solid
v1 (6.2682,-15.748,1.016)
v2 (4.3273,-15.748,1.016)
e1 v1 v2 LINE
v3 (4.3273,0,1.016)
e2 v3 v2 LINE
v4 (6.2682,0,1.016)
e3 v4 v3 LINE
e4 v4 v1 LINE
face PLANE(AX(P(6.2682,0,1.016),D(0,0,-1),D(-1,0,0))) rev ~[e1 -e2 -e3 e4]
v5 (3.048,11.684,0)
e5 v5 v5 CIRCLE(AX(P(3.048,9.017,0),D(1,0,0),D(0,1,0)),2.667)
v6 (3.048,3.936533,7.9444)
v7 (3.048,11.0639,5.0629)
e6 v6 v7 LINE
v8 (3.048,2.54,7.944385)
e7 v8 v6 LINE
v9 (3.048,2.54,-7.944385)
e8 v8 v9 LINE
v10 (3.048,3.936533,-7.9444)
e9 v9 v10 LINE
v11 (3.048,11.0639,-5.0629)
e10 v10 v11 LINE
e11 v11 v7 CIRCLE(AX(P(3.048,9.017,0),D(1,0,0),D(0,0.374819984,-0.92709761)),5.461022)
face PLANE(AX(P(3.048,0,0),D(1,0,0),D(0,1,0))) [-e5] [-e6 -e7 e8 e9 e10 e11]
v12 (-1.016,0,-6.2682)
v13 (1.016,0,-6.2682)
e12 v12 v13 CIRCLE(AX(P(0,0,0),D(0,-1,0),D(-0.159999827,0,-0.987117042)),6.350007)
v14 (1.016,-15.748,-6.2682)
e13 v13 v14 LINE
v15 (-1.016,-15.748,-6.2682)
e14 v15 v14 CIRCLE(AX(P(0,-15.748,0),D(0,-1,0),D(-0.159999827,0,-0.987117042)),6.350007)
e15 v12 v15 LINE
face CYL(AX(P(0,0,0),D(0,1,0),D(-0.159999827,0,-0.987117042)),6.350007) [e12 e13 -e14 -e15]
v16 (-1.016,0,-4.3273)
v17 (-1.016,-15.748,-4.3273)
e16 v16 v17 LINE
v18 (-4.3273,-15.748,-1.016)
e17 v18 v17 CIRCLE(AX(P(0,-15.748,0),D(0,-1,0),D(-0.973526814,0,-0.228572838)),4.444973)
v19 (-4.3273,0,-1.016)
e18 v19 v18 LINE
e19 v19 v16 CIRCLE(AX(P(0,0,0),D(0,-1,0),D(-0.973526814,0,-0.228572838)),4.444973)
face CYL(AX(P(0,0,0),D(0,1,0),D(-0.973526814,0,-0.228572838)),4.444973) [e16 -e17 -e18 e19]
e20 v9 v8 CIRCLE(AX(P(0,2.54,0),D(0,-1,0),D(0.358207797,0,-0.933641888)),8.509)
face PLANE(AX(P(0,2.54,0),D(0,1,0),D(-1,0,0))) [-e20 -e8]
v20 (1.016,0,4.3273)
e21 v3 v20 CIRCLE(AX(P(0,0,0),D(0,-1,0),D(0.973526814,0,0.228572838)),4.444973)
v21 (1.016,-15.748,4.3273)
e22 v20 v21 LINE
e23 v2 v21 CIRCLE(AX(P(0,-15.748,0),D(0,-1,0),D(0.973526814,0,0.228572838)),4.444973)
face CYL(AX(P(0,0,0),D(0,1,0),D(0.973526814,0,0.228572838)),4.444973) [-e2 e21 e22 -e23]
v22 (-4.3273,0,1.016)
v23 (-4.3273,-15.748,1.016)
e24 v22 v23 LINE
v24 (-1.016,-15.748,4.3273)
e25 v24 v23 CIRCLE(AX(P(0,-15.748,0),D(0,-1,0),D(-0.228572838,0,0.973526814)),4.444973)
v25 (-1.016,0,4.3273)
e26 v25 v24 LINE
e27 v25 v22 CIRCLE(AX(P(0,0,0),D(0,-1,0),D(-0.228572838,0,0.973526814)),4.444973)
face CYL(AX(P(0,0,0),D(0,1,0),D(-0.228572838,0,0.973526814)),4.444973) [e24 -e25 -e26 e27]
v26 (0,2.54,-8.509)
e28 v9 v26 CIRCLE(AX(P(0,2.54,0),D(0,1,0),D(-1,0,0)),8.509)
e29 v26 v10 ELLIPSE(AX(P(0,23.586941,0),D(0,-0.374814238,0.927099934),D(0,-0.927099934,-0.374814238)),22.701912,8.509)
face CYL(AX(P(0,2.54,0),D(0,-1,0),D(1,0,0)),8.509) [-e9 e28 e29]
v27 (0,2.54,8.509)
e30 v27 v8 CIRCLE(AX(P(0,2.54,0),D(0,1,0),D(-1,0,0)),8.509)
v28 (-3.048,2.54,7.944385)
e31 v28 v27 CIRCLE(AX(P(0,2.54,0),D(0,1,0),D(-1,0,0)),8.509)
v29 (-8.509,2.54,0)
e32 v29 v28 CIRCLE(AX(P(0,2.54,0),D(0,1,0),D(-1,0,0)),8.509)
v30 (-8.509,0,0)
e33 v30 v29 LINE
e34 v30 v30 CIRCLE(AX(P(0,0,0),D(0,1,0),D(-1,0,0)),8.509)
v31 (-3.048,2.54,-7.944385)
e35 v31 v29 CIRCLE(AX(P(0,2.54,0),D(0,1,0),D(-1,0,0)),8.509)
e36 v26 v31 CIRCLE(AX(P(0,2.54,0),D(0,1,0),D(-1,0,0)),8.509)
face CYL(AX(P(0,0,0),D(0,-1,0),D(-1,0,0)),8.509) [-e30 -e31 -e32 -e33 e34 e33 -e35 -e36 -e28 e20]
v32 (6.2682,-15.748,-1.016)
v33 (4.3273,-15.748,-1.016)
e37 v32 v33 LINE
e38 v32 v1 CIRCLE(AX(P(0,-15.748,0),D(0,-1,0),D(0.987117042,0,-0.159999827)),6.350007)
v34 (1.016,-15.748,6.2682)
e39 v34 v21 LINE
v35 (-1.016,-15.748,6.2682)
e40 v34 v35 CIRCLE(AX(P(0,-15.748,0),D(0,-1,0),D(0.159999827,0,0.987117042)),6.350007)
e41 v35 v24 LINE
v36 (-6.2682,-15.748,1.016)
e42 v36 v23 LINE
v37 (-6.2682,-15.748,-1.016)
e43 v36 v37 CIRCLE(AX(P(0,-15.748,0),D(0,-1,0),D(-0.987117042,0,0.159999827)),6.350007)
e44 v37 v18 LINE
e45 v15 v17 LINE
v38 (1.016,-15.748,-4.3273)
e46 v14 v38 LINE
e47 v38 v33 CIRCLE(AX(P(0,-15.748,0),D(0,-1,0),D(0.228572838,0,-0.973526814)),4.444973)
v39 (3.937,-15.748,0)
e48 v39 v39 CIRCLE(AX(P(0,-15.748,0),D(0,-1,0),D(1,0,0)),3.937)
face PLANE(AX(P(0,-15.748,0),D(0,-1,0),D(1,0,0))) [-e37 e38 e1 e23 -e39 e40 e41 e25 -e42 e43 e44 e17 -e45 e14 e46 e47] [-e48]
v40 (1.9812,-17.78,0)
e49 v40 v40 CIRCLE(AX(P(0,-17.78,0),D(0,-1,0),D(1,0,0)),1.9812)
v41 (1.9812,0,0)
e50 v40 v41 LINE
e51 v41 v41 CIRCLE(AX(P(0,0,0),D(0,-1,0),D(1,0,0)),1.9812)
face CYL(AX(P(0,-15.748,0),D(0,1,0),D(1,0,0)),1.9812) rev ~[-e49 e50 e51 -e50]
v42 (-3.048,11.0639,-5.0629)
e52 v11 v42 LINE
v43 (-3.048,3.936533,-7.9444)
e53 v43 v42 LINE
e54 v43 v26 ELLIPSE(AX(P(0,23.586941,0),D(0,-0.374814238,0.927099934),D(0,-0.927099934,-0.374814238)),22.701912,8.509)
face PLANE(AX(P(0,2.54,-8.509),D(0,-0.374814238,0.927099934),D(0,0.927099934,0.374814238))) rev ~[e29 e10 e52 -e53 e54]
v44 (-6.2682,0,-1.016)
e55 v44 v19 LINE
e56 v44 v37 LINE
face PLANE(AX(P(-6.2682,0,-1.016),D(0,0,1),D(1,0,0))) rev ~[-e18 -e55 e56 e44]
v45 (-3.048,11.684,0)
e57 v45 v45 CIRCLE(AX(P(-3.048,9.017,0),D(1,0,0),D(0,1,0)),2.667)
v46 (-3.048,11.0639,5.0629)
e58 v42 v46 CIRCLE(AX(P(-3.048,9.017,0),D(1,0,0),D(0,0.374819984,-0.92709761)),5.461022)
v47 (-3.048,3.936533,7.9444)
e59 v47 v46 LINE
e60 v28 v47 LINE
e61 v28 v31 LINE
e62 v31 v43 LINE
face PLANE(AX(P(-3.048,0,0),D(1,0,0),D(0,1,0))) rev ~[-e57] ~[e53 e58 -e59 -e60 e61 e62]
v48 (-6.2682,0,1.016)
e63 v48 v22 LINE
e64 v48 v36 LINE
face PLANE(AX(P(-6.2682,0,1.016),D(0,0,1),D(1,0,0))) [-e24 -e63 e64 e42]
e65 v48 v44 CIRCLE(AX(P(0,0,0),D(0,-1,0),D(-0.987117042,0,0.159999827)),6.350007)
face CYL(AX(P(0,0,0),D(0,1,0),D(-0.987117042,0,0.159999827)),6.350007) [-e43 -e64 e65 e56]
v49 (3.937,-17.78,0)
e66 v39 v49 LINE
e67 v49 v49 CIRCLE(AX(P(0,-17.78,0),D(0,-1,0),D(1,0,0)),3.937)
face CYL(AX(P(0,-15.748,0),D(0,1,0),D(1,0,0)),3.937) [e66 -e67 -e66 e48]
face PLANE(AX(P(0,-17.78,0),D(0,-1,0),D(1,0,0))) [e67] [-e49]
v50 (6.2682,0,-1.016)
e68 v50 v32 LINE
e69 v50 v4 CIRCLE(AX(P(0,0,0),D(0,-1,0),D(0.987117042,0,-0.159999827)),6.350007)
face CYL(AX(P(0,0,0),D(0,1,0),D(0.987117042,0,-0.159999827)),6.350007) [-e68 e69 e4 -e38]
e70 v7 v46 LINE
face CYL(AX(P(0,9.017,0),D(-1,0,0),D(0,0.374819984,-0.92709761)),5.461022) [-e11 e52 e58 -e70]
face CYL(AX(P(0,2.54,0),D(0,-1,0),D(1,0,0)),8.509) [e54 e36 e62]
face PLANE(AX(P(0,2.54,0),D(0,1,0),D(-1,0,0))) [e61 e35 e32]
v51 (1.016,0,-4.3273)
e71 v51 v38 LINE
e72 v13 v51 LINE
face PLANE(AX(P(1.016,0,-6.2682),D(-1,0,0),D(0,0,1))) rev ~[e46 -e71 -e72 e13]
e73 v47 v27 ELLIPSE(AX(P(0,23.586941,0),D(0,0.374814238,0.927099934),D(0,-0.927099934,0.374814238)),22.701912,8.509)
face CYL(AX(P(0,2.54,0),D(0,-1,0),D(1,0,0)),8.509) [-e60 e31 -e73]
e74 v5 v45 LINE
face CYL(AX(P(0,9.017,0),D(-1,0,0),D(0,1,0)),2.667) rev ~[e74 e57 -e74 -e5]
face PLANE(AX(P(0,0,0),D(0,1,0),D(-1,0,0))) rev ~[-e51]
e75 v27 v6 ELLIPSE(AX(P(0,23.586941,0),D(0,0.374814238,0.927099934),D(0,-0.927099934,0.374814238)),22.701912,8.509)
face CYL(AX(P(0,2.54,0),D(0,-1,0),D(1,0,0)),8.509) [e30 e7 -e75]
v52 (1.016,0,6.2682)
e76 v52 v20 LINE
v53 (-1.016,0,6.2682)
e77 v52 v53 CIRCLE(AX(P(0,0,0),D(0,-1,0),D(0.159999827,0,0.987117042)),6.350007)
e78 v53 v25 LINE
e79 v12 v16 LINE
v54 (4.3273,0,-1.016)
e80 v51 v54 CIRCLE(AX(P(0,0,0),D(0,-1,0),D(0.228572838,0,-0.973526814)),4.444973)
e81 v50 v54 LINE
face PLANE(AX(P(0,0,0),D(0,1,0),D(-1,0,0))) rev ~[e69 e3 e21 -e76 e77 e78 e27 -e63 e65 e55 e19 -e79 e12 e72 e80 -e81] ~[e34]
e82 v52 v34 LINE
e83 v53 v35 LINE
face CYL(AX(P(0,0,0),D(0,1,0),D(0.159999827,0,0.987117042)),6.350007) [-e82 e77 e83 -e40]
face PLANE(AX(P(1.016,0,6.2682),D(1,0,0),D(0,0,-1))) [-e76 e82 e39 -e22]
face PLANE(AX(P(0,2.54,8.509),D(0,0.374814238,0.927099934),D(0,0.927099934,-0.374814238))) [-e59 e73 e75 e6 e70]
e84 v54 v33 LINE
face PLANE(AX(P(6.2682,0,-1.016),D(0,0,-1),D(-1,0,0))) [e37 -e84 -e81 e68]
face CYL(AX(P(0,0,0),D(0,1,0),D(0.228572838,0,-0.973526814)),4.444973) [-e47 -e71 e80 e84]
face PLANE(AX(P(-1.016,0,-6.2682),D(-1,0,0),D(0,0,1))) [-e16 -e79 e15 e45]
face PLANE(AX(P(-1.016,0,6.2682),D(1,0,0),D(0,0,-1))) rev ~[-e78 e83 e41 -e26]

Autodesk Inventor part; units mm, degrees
ref_plane "YZ Plane" through (0, 0, 0) normal (1, 0, 0) x (0, 1, 0)
ref_plane "XZ Plane" through (0, 0, 0) normal (0, 1, 0) x (-1, 0, 0)
ref_plane "XY Plane" through (0, 0, 0) normal (0, 0, 1) x (1, 0, 0)
sketch "Sketch8" plane through (0, 0, 0) normal (0, 1, 0) x (-1, 0, 0)
  circle A0 centre (0, 0) radius 8.509
  dimension "d28" = 17.018
extrude "Extrusion7" add sketch "Sketch8" along normal blind 2.54
sketch "Sketch9" plane through (0, 0, 0) normal (1, 0, 0) x (0, 1, 0)
  line L0 (0, 8.509) -> (2.54, 8.509) projected
  line L1 (2.54, 8.509) -> (2.54, -8.509) projected
  line L2 (0, -8.509) -> (2.54, -8.509) projected
  line L3 (2.54, 8.509) -> (2.54, -8.509)
  line L4 (2.54, -8.509) -> (11.0639, -5.0629)
  line L5 (2.54, 8.509) -> (11.0639, 5.0629)
  arc A0 (11.0639, -5.0629) -> (11.0639, 5.0629) centre (9.017, 0) ccw
  circle A1 centre (9.017, 0) radius 2.667
  line L6 (-3.0224, 0) -> (5.6412, 0) construction
  line L7 (14.478, 5.5398) -> (14.478, 0.9968) construction
  point P0 (0, 0)
  dimension "d31" = 10.922
  dimension "d32" = 5.334
  dimension "d33" = 11.938
extrude "Extrusion8" add sketch "Sketch9" along normal mid plane 6.096
sketch "Sketch10" plane through (0, 2.54, 0) normal (0, 1, 0) x (1, 0, 0)
  arc A0 (3.048, -7.9444) -> (3.048, 7.9444) centre (0, 0) ccw projected
  circle A1 centre (0, 0) radius 8.509
  circle A2 centre (0, 0) radius 9.0384
  arc A3 (-3.048, 7.9444) -> (-3.048, -7.9444) centre (0, 0) ccw projected
  point P0 (-3.048, 8.509)
extrude "Extrusion9" cut sketch "Sketch10" along normal blind 12.7
sketch "Sketch11" plane through (0, 0, 0) normal (0, -1, 0) x (1, 0, 0)
  circle A0 centre (0, 0) radius 8.509 projected
  circle A1 centre (0, 0) radius 1.9812
  arc A2 (-6.2682, 1.016) -> (-6.2682, -1.016) centre (0, 0) ccw
  line L0 (-6.2682, 1.016) -> (-4.3273, 1.016)
  line L1 (-6.2682, -1.016) -> (-4.3273, -1.016)
  arc A3 (-1.016, -6.2682) -> (1.016, -6.2682) centre (0, 0) ccw
  line L2 (-1.016, -6.2682) -> (-1.016, -4.3273)
  line L3 (1.016, -6.2682) -> (1.016, -4.3273)
  arc A4 (6.2682, -1.016) -> (6.2682, 1.016) centre (0, 0) ccw
  line L4 (6.2682, -1.016) -> (4.3273, -1.016)
  line L5 (6.2682, 1.016) -> (4.3273, 1.016)
  arc A5 (1.016, 6.2682) -> (-1.016, 6.2682) centre (0, 0) ccw
  line L6 (1.016, 6.2682) -> (1.016, 4.3273)
  line L7 (-1.016, 6.2682) -> (-1.016, 4.3273)
  arc A6 (-1.016, 4.3273) -> (-4.3273, 1.016) centre (0, 0) ccw
  arc A7 (4.3273, 1.016) -> (1.016, 4.3273) centre (0, 0) ccw
  arc A8 (-4.3273, -1.016) -> (-1.016, -4.3273) centre (0, 0) ccw
  arc A9 (1.016, -4.3273) -> (4.3273, -1.016) centre (0, 0) ccw
  dimension "d38" = 3.9624
  dimension "d40" = 12.7
  dimension "d41" = 2.032
  dimension "d42" = 1.016
  dimension "d45" = 360
extrude "Extrusion10" add sketch "Sketch11" along normal blind 15.748 contours L0 A6 L7 A5 L6 A7 L5 A4 L4 A9 L3 A3 L2 A8 L1 A2
sketch "Sketch12" plane through (0, -15.748, 0) normal (0, -1, 0) x (1, 0, 0)
  circle A0 centre (0, 0) radius 1.9812 projected
  arc A1 (1.016, 6.2682) -> (-1.016, 6.2682) centre (0, 0) ccw projected
  circle A2 centre (0, 0) radius 1.9812
  circle A3 centre (0, 0) radius 3.937
  dimension "d49" = 7.874
extrude "Extrusion11" add sketch "Sketch12" along normal blind 2.032
properties part number "Shock Mount - Bottom"
